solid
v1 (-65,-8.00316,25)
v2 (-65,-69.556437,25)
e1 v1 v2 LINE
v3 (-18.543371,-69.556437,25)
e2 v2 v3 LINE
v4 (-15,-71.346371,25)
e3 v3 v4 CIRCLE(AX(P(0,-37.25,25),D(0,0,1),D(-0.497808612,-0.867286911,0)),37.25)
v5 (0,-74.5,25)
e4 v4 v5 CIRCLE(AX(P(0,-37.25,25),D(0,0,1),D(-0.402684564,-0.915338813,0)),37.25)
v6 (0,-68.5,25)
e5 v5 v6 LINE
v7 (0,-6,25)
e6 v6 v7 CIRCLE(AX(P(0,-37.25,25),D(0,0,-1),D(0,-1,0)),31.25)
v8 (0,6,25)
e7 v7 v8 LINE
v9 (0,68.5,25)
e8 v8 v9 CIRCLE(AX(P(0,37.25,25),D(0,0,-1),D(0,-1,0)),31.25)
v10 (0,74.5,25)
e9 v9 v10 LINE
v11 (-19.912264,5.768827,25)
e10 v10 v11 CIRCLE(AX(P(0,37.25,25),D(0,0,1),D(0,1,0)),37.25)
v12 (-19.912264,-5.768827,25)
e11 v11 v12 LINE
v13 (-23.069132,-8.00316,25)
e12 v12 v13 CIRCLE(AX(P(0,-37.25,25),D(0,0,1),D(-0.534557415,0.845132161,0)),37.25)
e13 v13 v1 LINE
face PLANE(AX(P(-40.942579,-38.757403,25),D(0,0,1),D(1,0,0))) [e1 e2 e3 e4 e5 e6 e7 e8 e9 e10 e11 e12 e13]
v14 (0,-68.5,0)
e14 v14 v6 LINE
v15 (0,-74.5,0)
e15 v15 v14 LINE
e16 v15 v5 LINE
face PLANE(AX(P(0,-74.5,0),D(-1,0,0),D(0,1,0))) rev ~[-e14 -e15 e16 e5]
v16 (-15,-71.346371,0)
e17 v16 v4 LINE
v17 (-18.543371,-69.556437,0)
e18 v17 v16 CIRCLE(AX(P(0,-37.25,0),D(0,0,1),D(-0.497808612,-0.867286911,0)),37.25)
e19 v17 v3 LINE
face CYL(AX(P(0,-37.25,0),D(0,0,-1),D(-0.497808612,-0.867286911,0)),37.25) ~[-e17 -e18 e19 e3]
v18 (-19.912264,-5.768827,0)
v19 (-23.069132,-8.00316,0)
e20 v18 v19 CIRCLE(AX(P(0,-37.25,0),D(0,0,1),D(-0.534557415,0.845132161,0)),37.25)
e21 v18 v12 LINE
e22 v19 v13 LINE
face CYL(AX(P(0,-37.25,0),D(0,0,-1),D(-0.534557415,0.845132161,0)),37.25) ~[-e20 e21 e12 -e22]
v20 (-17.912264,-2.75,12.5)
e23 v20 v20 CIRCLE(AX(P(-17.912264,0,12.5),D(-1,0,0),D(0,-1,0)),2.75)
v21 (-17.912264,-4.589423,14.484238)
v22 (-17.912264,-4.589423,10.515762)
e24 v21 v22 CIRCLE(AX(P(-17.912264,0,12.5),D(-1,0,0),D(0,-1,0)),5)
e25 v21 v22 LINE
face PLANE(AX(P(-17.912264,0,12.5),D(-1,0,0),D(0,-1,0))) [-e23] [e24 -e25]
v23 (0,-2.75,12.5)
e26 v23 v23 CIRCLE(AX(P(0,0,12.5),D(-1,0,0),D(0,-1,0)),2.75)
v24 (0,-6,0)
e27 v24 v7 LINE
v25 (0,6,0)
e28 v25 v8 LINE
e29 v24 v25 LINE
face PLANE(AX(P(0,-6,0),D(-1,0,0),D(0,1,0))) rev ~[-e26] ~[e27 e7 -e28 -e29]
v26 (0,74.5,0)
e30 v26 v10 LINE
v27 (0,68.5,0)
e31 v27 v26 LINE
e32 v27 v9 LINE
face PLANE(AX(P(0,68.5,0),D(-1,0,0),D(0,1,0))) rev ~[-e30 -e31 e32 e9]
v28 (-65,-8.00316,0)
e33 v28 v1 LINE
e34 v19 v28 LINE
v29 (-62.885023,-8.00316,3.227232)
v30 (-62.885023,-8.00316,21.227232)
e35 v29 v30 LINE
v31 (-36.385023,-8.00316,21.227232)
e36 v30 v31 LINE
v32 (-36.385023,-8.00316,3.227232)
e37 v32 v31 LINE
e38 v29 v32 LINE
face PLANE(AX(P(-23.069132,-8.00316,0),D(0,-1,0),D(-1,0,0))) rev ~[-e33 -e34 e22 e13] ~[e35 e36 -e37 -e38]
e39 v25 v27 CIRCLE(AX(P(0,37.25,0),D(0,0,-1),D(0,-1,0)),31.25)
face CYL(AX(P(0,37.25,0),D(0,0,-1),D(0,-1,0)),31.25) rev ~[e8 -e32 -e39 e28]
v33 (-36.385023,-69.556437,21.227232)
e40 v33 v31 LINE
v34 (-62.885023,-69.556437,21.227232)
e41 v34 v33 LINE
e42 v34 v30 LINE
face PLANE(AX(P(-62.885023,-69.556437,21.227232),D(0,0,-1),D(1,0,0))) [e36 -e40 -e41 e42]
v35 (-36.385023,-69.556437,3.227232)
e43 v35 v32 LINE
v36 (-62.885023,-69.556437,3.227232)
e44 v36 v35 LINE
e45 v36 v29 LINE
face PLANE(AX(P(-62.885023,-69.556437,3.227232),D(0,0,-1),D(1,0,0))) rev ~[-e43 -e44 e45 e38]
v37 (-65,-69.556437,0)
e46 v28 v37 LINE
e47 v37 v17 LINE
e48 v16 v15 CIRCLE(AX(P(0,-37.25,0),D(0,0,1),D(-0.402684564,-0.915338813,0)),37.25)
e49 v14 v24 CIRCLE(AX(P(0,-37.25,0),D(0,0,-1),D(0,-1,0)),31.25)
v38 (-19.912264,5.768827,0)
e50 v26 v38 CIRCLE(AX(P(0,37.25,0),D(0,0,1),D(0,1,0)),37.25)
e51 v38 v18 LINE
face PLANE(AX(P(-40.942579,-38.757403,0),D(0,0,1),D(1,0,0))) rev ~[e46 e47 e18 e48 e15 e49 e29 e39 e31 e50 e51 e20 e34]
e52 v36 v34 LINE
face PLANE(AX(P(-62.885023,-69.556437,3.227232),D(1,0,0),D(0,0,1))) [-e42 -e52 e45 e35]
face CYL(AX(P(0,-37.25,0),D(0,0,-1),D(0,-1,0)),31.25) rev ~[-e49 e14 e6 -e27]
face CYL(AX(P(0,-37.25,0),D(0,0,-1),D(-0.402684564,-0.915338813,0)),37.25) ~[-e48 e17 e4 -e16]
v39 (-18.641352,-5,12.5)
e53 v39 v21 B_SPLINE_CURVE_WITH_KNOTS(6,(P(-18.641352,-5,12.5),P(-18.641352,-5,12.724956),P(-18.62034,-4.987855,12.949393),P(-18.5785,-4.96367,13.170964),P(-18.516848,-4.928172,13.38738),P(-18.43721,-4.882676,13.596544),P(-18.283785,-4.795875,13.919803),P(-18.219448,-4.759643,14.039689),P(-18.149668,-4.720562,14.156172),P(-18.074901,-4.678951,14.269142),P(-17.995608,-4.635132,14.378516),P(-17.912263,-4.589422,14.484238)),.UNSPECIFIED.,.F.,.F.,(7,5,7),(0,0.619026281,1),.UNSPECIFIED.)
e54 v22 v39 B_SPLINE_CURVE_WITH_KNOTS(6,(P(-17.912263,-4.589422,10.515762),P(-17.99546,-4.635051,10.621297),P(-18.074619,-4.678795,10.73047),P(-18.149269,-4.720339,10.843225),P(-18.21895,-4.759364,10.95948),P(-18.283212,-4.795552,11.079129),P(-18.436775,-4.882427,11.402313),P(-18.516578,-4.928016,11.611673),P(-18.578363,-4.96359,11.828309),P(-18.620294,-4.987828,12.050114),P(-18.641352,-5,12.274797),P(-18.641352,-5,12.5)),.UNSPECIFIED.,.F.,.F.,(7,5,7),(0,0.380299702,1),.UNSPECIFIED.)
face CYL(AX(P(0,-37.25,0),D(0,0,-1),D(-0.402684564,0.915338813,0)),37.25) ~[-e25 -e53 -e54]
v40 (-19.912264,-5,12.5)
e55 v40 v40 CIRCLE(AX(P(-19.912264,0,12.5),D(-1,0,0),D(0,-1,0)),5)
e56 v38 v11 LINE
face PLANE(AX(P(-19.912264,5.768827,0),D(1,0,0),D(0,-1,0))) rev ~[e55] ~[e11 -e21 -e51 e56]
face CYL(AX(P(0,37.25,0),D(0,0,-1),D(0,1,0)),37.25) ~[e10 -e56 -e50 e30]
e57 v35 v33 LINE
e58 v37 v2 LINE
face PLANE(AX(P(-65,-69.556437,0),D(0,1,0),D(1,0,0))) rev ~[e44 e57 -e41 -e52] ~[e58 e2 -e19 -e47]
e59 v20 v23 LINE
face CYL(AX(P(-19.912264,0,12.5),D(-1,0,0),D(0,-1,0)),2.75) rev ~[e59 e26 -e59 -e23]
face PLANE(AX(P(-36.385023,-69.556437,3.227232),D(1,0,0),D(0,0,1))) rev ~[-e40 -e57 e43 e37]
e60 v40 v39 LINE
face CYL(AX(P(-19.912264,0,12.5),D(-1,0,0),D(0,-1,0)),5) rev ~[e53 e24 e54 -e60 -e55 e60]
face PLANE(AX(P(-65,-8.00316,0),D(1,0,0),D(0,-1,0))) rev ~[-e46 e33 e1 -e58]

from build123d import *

# Parameters (mm, degrees)
F1_DEPTH = 25
F2_R     = 2.75
F3_DEPTH = 19.9132636974
F4_R     = 5
F5_DEPTH = 2
F6_DEPTH = 25
F7_W     = 26.5
F7_H     = 18
F8_DEPTH = 61.5532770753


with BuildPart() as f1:
    # F0 (on Top) → F1 (new body)
    with BuildSketch(Plane.XY):
        with BuildLine():
            Line((0, 68.5), (0, 74.5))
            ThreePointArc((0, 74.5), (-35.7787380635, 47.6155391844), (-19.9122636974, 5.7688269843))
            ThreePointArc((-19.9122636974, 5.7688269843), (-10.3655391695, 1.4712619322), (3.09e-08, 0))
            Line((0, 0), (0, 6))
            ThreePointArc((0, 6), (-31.25, 37.25), (0, 68.5))
        make_face()
        with BuildLine():
            ThreePointArc((3.09e-08, 0), (-10.3655391695, 1.4712619322), (-19.9122636974, 5.7688269843))
            Line((-19.9122636974, 5.7688269843), (-19.9122636974, -5.7688269843))
            ThreePointArc((-19.9122636974, -5.7688269843), (-17.5050379591, -4.3693651818), (-15, -3.1536292254))
            ThreePointArc((-15, -3.1536292254), (-7.6639639933, -0.7969321468), (3.09e-08, 0))
        make_face()
        with BuildLine():
            Line((0, -6), (0, 0))
            ThreePointArc((3.09e-08, 0), (-7.6639639933, -0.7969321468), (-15, -3.1536292254))
            Line((-15, -3.1536292254), (-15, -8.0031603575))
            Line((-15, -8.0031603575), (-23.0691324268, -8.0031603575))
            ThreePointArc((-23.0691324268, -8.0031603575), (-27.5276929828, -12.1544103666), (-31.25, -16.9768650673))
            ThreePointArc((-31.25, -16.9768650673), (-37.25, -37.25), (-31.25, -57.5231349327))
            ThreePointArc((-31.25, -57.5231349327), (-25.6133761152, -64.2965795246), (-18.543370794, -69.5564374328))
            Line((-18.543370794, -69.5564374328), (-15, -69.5564374328))
            Line((-15, -69.5564374328), (-15, -71.3463707746))
            ThreePointArc((-15, -71.3463707746), (-7.6639640084, -73.70306785), (0, -74.5))
            Line((0, -74.5), (0, -68.5))
            ThreePointArc((0, -68.5), (-31.25, -37.25), (0, -6))
        make_face()
        with BuildLine():
            ThreePointArc((-18.543370794, -69.5564374328), (-16.7955469217, -70.4986406279), (-15, -71.3463707746))
            Line((-15, -71.3463707746), (-15, -69.5564374328))
            Line((-15, -69.5564374328), (-18.543370794, -69.5564374328))
        make_face()
    extrude(amount=F1_DEPTH)

    # F2 (on face) → F3 (cut, through all)
    with BuildSketch(Plane(origin=(-19.9122636974, 0, 0), x_dir=(0, -1, 0), z_dir=(-1, 0, 0))):
        with Locations((0, 12.5)):
            Circle(F2_R)
    extrude(amount=-F3_DEPTH, mode=Mode.SUBTRACT)

    # F4 (on face) → F5 (cut)
    with BuildSketch(Plane(origin=(-19.9122636974, 0, 0), x_dir=(0, -1, 0), z_dir=(-1, 0, 0))):
        with Locations((0, 12.5)):
            Circle(F4_R)
    extrude(amount=-F5_DEPTH, mode=Mode.SUBTRACT)

    # F0 (on Top) → F6 (join)
    with BuildSketch(Plane.XY):
        with BuildLine():
            ThreePointArc((-31.25, -57.5231349327), (-37.25, -37.25), (-31.25, -16.9768650673))
            Line((-31.25, -16.9768650673), (-31.25, -12.7797988951))
            Line((-31.25, -12.7797988951), (-48.75, -12.7797988951))
            Line((-48.75, -12.7797988951), (-48.75, -64.7797988951))
            Line((-48.75, -64.7797988951), (-31.25, -64.7797988951))
            Line((-31.25, -64.7797988951), (-31.25, -57.5231349327))
        make_face()
        with BuildLine():
            ThreePointArc((-31.25, -16.9768650673), (-27.5276929828, -12.1544103666), (-23.0691324268, -8.0031603575))
            Line((-23.0691324268, -8.0031603575), (-65, -8.0031603575))
            Line((-65, -8.0031603575), (-65, -69.5564374328))
            Line((-65, -69.5564374328), (-18.543370794, -69.5564374328))
            ThreePointArc((-18.543370794, -69.5564374328), (-25.6133761152, -64.2965795246), (-31.25, -57.5231349327))
            Line((-31.25, -57.5231349327), (-31.25, -64.7797988951))
            Line((-31.25, -64.7797988951), (-48.75, -64.7797988951))
            Line((-48.75, -64.7797988951), (-48.75, -12.7797988951))
            Line((-48.75, -12.7797988951), (-31.25, -12.7797988951))
            Line((-31.25, -12.7797988951), (-31.25, -16.9768650673))
        make_face()
        with BuildLine():
            ThreePointArc((-15, -3.1536292254), (-17.5050379591, -4.3693651818), (-19.9122636974, -5.7688269843))
            ThreePointArc((-19.9122636974, -5.7688269843), (-21.5197157184, -6.8449948956), (-23.0691324268, -8.0031603575))
            Line((-23.0691324268, -8.0031603575), (-15, -8.0031603575))
            Line((-15, -8.0031603575), (-15, -3.1536292254))
        make_face()
    extrude(amount=F6_DEPTH)

    # F7 (on face) → F8 (cut, through all)
    with BuildSketch(Plane.XZ.offset(69.5564374328)):
        with Locations((-49.6350233853, 12.2272316366)):
            Rectangle(F7_W, F7_H)
    extrude(amount=-F8_DEPTH, mode=Mode.SUBTRACT)


solid = f1.part
